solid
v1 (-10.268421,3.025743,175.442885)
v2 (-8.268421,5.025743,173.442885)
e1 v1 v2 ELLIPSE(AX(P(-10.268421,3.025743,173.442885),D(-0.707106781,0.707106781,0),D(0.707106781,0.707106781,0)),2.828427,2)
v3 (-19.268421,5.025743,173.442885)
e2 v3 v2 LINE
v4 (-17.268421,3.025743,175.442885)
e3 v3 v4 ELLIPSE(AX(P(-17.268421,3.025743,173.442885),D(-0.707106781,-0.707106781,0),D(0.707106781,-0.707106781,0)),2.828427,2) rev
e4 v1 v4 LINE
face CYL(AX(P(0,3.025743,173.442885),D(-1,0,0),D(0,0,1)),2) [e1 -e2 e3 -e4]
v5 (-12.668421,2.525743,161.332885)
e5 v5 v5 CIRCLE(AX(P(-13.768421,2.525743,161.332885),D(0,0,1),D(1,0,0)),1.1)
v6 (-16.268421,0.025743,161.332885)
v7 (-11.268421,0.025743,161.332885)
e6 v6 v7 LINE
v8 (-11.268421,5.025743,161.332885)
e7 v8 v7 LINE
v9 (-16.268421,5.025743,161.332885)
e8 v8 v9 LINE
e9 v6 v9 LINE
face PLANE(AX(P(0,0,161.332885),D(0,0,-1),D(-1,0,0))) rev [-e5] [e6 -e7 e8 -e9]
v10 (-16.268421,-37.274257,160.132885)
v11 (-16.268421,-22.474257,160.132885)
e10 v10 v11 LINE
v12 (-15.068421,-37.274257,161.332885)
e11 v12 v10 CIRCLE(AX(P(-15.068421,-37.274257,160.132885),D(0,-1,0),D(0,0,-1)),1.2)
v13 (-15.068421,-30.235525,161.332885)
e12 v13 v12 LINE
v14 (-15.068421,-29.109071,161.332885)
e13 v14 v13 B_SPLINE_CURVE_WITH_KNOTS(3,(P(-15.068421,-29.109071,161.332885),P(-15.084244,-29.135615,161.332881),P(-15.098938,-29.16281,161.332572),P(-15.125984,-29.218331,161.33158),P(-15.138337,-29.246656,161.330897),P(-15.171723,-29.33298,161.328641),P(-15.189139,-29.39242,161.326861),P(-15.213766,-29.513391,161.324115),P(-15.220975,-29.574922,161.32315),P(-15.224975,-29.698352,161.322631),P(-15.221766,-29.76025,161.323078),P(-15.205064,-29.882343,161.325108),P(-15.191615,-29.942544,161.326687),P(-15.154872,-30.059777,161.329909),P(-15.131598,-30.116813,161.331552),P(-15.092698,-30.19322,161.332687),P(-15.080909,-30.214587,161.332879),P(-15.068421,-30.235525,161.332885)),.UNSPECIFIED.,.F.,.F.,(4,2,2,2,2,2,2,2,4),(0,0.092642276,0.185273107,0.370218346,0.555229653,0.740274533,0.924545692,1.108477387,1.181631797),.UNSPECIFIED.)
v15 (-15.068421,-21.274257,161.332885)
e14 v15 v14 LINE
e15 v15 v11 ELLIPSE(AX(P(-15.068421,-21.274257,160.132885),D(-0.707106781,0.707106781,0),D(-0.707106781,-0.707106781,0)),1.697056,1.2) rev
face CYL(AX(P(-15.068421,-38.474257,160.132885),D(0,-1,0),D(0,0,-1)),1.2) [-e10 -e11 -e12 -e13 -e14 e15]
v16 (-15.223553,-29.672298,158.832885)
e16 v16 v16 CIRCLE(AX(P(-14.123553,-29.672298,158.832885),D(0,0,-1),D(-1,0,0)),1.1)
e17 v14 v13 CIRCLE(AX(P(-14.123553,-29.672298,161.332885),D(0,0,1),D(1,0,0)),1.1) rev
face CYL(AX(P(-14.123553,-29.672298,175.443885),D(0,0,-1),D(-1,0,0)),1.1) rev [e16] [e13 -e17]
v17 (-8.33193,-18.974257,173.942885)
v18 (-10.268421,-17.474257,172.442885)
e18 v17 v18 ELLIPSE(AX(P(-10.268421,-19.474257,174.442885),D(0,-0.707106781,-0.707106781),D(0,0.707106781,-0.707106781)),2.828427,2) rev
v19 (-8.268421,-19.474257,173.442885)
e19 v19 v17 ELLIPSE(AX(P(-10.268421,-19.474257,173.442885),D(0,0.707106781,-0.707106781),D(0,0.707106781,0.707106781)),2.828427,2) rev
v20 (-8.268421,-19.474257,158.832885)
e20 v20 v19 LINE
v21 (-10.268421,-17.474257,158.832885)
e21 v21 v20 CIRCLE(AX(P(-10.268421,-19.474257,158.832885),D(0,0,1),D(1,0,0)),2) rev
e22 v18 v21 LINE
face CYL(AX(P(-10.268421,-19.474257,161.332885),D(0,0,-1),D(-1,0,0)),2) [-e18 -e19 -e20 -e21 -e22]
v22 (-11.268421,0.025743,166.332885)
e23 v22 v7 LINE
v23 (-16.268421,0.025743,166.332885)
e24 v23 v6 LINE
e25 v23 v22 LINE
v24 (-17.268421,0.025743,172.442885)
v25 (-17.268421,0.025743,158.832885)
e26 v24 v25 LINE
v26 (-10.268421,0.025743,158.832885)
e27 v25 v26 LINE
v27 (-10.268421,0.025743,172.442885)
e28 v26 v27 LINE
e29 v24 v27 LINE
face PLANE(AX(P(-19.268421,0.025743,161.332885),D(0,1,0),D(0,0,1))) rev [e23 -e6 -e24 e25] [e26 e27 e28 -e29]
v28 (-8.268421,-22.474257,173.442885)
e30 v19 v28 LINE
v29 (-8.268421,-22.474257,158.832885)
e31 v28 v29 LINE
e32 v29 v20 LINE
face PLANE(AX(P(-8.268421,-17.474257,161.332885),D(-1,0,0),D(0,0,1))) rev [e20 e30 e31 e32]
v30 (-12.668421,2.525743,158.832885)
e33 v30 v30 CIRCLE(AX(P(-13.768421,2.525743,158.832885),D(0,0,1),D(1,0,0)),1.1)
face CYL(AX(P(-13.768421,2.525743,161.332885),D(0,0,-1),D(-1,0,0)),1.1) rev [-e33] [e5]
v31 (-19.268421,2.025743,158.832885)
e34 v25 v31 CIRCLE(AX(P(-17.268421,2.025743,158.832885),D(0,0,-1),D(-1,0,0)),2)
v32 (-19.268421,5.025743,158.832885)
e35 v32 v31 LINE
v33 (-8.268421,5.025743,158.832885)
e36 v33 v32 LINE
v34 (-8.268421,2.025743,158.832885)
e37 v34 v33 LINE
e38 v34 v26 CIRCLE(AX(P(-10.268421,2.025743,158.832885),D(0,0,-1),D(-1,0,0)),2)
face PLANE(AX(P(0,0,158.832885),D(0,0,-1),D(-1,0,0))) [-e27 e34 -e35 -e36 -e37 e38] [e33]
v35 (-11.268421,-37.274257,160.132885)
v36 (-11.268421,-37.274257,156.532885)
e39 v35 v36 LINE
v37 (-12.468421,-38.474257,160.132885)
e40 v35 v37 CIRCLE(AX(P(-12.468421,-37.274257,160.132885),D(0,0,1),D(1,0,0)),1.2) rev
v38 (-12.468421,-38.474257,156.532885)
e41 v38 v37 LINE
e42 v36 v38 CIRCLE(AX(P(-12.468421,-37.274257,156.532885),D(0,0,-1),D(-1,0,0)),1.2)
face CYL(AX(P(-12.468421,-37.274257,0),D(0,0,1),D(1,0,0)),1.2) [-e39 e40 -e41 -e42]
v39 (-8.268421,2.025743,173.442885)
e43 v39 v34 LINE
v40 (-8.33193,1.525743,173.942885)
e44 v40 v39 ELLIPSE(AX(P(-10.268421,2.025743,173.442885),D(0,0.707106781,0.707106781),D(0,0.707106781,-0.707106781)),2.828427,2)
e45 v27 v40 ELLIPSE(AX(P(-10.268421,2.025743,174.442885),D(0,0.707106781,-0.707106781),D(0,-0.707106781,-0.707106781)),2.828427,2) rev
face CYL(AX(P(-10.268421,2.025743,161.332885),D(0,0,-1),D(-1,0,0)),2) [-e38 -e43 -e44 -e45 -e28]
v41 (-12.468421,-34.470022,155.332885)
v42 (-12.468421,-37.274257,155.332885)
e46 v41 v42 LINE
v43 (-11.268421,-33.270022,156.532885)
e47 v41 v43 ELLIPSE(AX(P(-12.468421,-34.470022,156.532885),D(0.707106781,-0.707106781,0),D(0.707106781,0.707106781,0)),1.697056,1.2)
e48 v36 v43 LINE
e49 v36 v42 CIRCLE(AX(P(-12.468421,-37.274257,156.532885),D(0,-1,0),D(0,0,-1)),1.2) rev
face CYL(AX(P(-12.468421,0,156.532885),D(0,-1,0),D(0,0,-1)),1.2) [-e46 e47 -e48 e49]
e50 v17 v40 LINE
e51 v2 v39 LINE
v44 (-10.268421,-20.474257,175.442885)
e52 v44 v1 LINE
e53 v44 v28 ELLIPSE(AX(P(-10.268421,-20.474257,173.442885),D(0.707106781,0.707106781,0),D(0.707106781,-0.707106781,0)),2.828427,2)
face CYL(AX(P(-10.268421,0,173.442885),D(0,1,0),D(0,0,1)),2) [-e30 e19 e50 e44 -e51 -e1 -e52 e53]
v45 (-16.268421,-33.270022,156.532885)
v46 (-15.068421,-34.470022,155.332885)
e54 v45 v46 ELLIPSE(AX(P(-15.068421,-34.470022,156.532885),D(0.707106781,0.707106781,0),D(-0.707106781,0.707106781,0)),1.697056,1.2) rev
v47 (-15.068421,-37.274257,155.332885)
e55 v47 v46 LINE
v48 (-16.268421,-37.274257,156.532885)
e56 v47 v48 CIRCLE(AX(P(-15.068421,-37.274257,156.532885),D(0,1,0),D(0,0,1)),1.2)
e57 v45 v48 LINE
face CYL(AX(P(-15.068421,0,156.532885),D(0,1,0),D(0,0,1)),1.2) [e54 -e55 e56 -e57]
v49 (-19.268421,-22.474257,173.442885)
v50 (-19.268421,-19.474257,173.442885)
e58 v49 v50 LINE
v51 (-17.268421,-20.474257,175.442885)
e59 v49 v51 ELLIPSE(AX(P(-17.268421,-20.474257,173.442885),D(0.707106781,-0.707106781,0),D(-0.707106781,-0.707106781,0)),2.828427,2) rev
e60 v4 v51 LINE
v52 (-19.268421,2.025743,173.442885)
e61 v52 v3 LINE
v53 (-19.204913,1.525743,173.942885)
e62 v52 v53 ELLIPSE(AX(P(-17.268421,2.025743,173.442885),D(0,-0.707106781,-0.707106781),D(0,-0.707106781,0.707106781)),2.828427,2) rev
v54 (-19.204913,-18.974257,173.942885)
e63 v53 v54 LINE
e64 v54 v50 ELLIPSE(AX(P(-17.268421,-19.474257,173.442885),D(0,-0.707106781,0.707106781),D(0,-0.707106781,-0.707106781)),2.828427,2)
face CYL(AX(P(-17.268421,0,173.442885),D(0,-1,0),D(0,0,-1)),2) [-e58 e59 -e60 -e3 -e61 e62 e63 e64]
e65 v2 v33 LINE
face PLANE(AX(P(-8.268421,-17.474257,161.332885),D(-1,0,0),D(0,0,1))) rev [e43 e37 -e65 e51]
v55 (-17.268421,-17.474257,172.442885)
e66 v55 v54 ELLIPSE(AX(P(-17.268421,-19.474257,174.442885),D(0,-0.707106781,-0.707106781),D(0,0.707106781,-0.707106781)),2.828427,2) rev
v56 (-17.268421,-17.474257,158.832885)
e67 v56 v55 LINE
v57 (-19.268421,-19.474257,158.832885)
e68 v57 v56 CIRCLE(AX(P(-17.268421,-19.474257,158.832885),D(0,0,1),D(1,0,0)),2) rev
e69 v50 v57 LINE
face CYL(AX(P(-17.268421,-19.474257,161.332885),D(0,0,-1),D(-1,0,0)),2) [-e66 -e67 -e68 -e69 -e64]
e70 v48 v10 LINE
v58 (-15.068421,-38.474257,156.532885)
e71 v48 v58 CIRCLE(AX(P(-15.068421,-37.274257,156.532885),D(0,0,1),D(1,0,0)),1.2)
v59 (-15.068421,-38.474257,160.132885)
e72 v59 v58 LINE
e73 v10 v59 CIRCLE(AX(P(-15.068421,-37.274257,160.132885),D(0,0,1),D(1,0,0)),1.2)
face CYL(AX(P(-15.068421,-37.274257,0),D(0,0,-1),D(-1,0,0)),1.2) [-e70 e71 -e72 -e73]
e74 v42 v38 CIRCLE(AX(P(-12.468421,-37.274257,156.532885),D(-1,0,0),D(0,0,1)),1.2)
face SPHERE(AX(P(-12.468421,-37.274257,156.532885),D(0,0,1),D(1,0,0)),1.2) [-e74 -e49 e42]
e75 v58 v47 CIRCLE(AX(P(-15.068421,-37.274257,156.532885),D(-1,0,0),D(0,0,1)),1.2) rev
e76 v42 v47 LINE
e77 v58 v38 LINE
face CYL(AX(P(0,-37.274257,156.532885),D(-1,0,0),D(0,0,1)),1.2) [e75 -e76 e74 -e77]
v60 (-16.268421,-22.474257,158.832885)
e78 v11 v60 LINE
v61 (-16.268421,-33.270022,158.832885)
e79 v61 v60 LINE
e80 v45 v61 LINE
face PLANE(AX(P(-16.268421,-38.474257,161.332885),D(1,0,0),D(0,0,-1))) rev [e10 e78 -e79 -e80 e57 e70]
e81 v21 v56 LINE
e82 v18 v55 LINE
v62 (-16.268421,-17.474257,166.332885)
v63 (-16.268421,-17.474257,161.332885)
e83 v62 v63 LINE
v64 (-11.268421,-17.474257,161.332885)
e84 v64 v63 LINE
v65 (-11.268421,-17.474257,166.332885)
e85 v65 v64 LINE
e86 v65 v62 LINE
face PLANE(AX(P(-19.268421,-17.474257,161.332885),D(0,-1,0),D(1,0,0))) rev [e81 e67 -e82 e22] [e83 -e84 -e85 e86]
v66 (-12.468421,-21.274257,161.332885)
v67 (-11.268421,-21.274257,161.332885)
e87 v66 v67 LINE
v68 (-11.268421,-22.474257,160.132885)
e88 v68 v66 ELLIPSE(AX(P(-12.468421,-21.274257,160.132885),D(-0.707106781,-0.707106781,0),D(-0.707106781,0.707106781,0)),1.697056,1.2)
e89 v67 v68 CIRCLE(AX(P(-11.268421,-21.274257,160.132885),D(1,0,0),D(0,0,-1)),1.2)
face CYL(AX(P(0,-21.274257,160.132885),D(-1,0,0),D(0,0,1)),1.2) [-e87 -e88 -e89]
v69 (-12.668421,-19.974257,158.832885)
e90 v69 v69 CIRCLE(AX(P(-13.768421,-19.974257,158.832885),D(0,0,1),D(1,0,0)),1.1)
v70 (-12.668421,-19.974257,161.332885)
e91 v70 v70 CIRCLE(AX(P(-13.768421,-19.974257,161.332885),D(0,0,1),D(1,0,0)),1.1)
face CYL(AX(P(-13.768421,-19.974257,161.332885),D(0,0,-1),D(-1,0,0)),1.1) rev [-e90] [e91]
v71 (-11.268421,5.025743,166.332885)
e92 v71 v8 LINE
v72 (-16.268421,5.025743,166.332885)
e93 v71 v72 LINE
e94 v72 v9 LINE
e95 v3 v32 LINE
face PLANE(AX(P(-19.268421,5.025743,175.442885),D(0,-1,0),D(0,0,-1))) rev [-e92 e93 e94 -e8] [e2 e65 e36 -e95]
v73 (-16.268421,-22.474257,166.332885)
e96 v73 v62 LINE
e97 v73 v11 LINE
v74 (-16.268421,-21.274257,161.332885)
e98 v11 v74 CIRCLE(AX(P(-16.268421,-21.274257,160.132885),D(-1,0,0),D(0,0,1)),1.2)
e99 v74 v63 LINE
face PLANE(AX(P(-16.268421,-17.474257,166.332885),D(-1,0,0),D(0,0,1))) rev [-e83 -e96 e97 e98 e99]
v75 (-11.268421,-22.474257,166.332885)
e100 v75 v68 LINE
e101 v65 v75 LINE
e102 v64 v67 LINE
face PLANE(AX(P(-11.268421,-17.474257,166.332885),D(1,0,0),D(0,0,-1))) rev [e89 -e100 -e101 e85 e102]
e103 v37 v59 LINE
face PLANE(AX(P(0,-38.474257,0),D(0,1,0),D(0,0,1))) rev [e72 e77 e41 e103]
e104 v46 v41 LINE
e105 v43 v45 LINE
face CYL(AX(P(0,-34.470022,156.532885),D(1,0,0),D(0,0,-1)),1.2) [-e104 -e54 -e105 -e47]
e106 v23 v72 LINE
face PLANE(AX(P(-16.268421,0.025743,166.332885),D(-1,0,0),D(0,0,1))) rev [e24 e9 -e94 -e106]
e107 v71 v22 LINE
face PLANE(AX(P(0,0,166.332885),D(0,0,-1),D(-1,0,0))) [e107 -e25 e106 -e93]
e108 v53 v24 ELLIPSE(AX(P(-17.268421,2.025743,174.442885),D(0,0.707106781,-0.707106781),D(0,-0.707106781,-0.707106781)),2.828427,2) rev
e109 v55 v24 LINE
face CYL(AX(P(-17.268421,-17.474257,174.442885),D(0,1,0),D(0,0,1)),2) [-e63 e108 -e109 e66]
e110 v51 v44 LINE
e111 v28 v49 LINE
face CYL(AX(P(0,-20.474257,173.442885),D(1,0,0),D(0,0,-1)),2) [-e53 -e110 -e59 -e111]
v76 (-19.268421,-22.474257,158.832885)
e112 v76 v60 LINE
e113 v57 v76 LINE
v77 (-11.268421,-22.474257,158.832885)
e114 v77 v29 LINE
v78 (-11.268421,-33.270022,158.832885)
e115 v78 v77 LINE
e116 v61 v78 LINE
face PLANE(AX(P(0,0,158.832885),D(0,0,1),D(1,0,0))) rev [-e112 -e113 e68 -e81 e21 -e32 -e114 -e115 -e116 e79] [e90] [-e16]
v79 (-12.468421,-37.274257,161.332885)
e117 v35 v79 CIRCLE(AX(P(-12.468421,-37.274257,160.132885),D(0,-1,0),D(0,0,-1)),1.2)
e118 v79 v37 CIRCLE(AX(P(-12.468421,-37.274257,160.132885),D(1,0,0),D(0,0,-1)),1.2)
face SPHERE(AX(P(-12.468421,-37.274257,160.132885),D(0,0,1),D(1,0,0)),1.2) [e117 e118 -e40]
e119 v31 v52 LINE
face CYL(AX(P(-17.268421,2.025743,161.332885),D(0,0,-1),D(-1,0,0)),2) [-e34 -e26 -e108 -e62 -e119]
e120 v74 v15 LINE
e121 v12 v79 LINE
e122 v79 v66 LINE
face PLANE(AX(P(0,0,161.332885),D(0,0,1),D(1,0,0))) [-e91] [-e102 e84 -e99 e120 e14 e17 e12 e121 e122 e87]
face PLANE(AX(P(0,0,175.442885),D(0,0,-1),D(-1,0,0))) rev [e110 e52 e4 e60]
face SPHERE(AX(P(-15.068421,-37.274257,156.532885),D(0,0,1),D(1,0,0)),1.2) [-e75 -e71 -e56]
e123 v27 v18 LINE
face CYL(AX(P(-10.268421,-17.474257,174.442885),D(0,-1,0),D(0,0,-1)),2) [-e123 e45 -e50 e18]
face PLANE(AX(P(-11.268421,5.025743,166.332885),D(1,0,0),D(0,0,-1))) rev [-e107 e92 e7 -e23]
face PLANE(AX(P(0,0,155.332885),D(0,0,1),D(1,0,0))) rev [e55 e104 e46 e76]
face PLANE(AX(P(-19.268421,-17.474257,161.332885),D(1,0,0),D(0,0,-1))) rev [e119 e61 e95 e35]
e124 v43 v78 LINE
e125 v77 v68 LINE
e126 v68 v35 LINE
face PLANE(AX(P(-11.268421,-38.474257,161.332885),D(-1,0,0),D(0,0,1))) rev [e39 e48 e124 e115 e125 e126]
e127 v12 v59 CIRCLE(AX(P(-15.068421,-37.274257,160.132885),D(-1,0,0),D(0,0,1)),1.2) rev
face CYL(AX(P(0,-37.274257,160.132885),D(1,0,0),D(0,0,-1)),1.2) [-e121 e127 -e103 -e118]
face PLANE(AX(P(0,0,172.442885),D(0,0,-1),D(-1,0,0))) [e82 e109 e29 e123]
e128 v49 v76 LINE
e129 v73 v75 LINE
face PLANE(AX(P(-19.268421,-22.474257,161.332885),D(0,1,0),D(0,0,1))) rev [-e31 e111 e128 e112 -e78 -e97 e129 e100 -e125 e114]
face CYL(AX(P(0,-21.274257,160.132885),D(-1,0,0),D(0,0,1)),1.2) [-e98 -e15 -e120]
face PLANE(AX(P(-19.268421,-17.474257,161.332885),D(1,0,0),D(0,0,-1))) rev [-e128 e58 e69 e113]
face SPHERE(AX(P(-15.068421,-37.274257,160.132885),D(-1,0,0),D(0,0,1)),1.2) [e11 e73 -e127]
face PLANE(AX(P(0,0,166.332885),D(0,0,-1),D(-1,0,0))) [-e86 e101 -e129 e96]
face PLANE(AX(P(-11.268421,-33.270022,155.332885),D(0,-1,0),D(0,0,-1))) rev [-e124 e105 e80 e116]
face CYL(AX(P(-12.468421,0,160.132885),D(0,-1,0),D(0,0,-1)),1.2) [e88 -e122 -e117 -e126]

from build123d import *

# Parameters (mm, degrees)
SZKIC1_R                      = 1.100000000000001
DODANIE_WYCI_GNI_CIE1_DEPTH   = 2.5
SZKIC1_W                      = 10.999999999999996
SZKIC1_H                      = 5.000000000000001
SZKIC1_R_2                    = 1.1000003399999918
DODANIE_WYCI_GNI_CIE1_2_DEPTH = 2.5
SKETCH1_W                     = 2.9999999999999964
SKETCH1_H                     = 5
SKETCH1_W_2                   = 2.999999999999993
SKETCH1_H_2                   = 5.000000000000001
SKETCH1_W_3                   = 3
SKETCH1_H_3                   = 5.0000000000000036
BOSS_EXTRUDE1_DEPTH           = 5
SKETCH2_W                     = 11.000000000000002
SKETCH2_H                     = 5.0000000000000036
SKETCH2_W_2                   = 10.999999999999996
SKETCH2_H_2                   = 5.000000000000001
BOSS_EXTRUDE2_DEPTH           = 6.11
SKETCH3_W                     = 11
SKETCH3_H                     = 27.5
BOSS_EXTRUDE3_DEPTH           = 3
FILLET1_R                     = 2
FILLET4_R                     = 2
SKETCH4_W                     = 5.000000000000005
SKETCH4_H                     = 2.5000000000000284
BOSS_EXTRUDE4_DEPTH           = 16
SKETCH5_W                     = 5.000000000000005
SKETCH5_H                     = 5.204234406731111
BOSS_EXTRUDE5_DEPTH           = 3.5
CUT_EXTRUDE1_REACH            = 48.124
SKETCH6_R                     = 1.100000000000001
FILLET5_R                     = 1.2
FILLET6_R                     = 1.2
FILLET7_R                     = 1.2


# Some blends are built 0.0001 mm under size
with BuildPart() as part:
    # Szkic1 → Dodanie-wyciągnięcie1 (new body)
    with BuildSketch(Plane.XY.offset(158.8328846419772)):
        Polygon((-19.268421222013334, -17.474256580110417), (-8.268421222013332, -17.474256580110413), (-8.268421222013332, -22.474256580110417), (-19.268421222013334, -22.474256580110417), align=None)
        with Locations((-13.768421222013336, -19.974256580110417)):
            Circle(SZKIC1_R, mode=Mode.SUBTRACT)
    extrude(amount=DODANIE_WYCI_GNI_CIE1_DEPTH)



with BuildPart() as body_2:
    # Szkic1 → Dodanie-wyci_gni_cie1 2 (new body)
    with BuildSketch(Plane.XY.offset(158.8328846419772)):
        with Locations((-13.768421222013332, 2.5257434198895825)):
            Rectangle(SZKIC1_W, SZKIC1_H)
        with Locations((-13.768421222013332, 2.5257434198895856)):
            Circle(SZKIC1_R_2, mode=Mode.SUBTRACT)
    extrude(amount=DODANIE_WYCI_GNI_CIE1_2_DEPTH)


with BuildPart() as part_1:
    add(part.part)

    add(body_2.part)  # Boss-Extrude1 merges body 2
    # Sketch1 → Boss-Extrude1 (add)
    with BuildSketch(Plane.XY.offset(161.33288464197722)):
        with Locations((-17.768421222013338, -19.974256580110417)):
            Rectangle(SKETCH1_W, SKETCH1_H)
        with Locations((-17.768421222013334, 2.5257434198895825)):
            Rectangle(SKETCH1_W_2, SKETCH1_H_2)
        with Locations((-9.768421222013334, 2.5257434198895825)):
            Rectangle(SKETCH1_W_3, SKETCH1_H_2)
        with Locations((-9.768421222013332, -19.974256580110413)):
            Rectangle(SKETCH1_W_3, SKETCH1_H_3)
    extrude(amount=BOSS_EXTRUDE1_DEPTH)

    # Sketch2 → Boss-Extrude2 (add)
    with BuildSketch(Plane.XY.offset(166.33288464197722)):
        with Locations((-13.768421222013334, -19.974256580110413)):
            Rectangle(SKETCH2_W, SKETCH2_H)
        with Locations((-13.768421222013332, 2.5257434198895825)):
            Rectangle(SKETCH2_W_2, SKETCH2_H_2)
    extrude(amount=BOSS_EXTRUDE2_DEPTH)

    # Sketch3 → Boss-Extrude3 (add)
    with BuildSketch(Plane.XY.offset(172.4428846419772)):
        with Locations((-13.768421222013334, -8.724256580110417)):
            Rectangle(SKETCH3_W, SKETCH3_H)
    extrude(amount=BOSS_EXTRUDE3_DEPTH)

    # Fillet1
    fillet1_edges = [part_1.edges().sort_by_distance(p)[0] for p in [
        (-19.268421222013334, -8.724256580110417, 175.4428846419772),
        (-13.768421222013334, -22.474256580110417, 175.4428846419772),
        (-8.268421222013334, -8.724256580110417, 175.4428846419772),
        (-13.768421222013334, 5.025743419889583, 175.4428846419772),
    ]]
    fillet(fillet1_edges, radius=FILLET1_R)

    # Fillet4
    # the kernel refuses this fillet: 2 mm, written as the material it takes off along each edge
    with BuildSketch(Plane(origin=(-8.268421222013334, -17.474256580110413, 172.4428846419772), x_dir=(0, 0, 1), z_dir=(0, 1, 0))) as fillet4_piece_1:
        with BuildLine():
            CenterArc((FILLET4_R, -FILLET4_R), FILLET4_R, 90, 90)
            Line((0, -FILLET4_R), (0, 0))
            Line((0, 0), (FILLET4_R, 0))
        make_face()
    extrude(amount=17.499999999999996, mode=Mode.SUBTRACT)
    with BuildSketch(Plane(origin=(-19.268421222013334, 0.02574341988958206, 172.4428846419772), x_dir=(1.78e-15, 0, 1), z_dir=(0, -1, 0))) as fillet4_piece_2:
        with BuildLine():
            CenterArc((FILLET4_R, -FILLET4_R), FILLET4_R, 90.0000000000001, 89.9999999999999)
            Line((3.55e-15, -FILLET4_R), (0, 0))
            Line((0, 0), (FILLET4_R, 0))
        make_face()
    extrude(amount=17.499999999999996, mode=Mode.SUBTRACT)
    with BuildSketch(Plane(origin=(-8.268421222013334, 0.02574341988958231, 153.8328846419772), x_dir=(0, 1, 0), z_dir=(0, 0, 1)), Plane(origin=(-19.26842122201333, 0.02574341988958231, 172.44288464197723), x_dir=(0, 1, 0), z_dir=(0, 0, -1))) as fillet4_piece_3:
        with BuildLine():
            CenterArc((FILLET4_R, FILLET4_R), FILLET4_R, 180, 90)
            Line((-2.5e-16, FILLET4_R), (0, 0))
            Line((0, 0), (FILLET4_R, 0))
        make_face()
    extrude(amount=18.610000000000042, mode=Mode.SUBTRACT)
    with BuildSketch(Plane(origin=(-19.26842122201333, -17.474256580110417, 153.8328846419772), x_dir=(0, -1, 2.6e-16), z_dir=(0, 2.6e-16, 1))) as fillet4_piece_4:
        with BuildLine():
            CenterArc((FILLET4_R, FILLET4_R), FILLET4_R, 180, 90)
            Line((0, FILLET4_R), (0, 0))
            Line((0, 0), (FILLET4_R, 0))
        make_face()
    extrude(amount=18.610000000000042, mode=Mode.SUBTRACT)
    with BuildSketch(Plane(origin=(-8.268421222013332, -17.474256580110413, 172.44288464197723), x_dir=(-8.9e-16, -1, 0), z_dir=(0, 0, -1))) as fillet4_piece_5:
        with BuildLine():
            CenterArc((FILLET4_R, FILLET4_R), FILLET4_R, 180, 89.99999999999994)
            Line((1.78e-15, FILLET4_R), (0, 0))
            Line((0, 0), (FILLET4_R, 0))
        make_face()
    extrude(amount=18.610000000000042, mode=Mode.SUBTRACT)
    with BuildSketch(Plane(origin=(-8.268421222013334, -17.474256580110413, 177.44288464197723), x_dir=(0, -1, 0), z_dir=(0, 0, -1))) as fillet4_piece_6a_section:
        with BuildLine():
            CenterArc((FILLET4_R, FILLET4_R), FILLET4_R, 180.00000000000006, 89.99999999999994)
            Line((0, FILLET4_R), (0, 0))
            Line((0, 0), (FILLET4_R, 0))
        make_face()
    fillet4_piece_6a = extrude(amount=23.610000000000042, mode=Mode.PRIVATE)
    fillet4_piece_6a = split(fillet4_piece_6a, bisect_by=Plane(origin=(-8.721211450546983, -17.92704680864406, 172.4428846419772), z_dir=(0, 0, 1)), keep=Keep.TOP, mode=Mode.PRIVATE)
    with BuildSketch(Plane(origin=(-8.268421222013334, -22.474256580110413, 172.4428846419772), x_dir=(0, 0, 1), z_dir=(0, 1, 0))) as fillet4_piece_6b_section:
        with BuildLine():
            CenterArc((FILLET4_R, -FILLET4_R), FILLET4_R, 90, 90)
            Line((0, -FILLET4_R), (0, 0))
            Line((0, 0), (FILLET4_R, 0))
        make_face()
    fillet4_piece_6b = extrude(amount=22.499999999999996, mode=Mode.PRIVATE)
    fillet4_piece_6b = split(fillet4_piece_6b, bisect_by=Plane(origin=(-8.721211450546978, -17.474256580110413, 172.89567487051085), z_dir=(3.2e-16, -1, 0)), keep=Keep.TOP, mode=Mode.PRIVATE)
    fillet4_piece_6 = fillet4_piece_6a & fillet4_piece_6b
    add(fillet4_piece_6, mode=Mode.SUBTRACT)
    with BuildSketch(Plane(origin=(-8.268421222013334, -17.474256580110413, 172.4428846419772), x_dir=(0, 0, 1), z_dir=(0, 1, 0))) as fillet4_piece_7a_section:
        with BuildLine():
            CenterArc((FILLET4_R, -FILLET4_R), FILLET4_R, 90, 90)
            Line((0, -FILLET4_R), (0, 0))
            Line((0, 0), (FILLET4_R, 0))
        make_face()
    fillet4_piece_7a = extrude(amount=22.499999999999996, mode=Mode.PRIVATE)
    fillet4_piece_7a = split(fillet4_piece_7a, bisect_by=Plane(origin=(-8.721211450546976, 0.02574341988958231, 172.89567487051085), z_dir=(0, 1, 0)), keep=Keep.TOP, mode=Mode.PRIVATE)
    with BuildSketch(Plane(origin=(-8.268421222013334, 0.02574341988958231, 153.8328846419772), x_dir=(0, 1, 0), z_dir=(0, 0, 1))) as fillet4_piece_7b_section:
        with BuildLine():
            CenterArc((FILLET4_R, FILLET4_R), FILLET4_R, 180, 90)
            Line((-2.5e-16, FILLET4_R), (0, 0))
            Line((0, 0), (FILLET4_R, 0))
        make_face()
    fillet4_piece_7b = extrude(amount=23.610000000000042, mode=Mode.PRIVATE)
    fillet4_piece_7b = split(fillet4_piece_7b, bisect_by=Plane(origin=(-8.721211450546985, 0.4785336484232321, 172.4428846419772), z_dir=(0, 0, 1)), keep=Keep.TOP, mode=Mode.PRIVATE)
    fillet4_piece_7 = fillet4_piece_7a & fillet4_piece_7b
    add(fillet4_piece_7, mode=Mode.SUBTRACT)
    with BuildSketch(Plane(origin=(-19.26842122201333, 0.02574341988958206, 177.44288464197723), x_dir=(0, 1, 0), z_dir=(0, 0, -1))) as fillet4_piece_8a_section:
        with BuildLine():
            CenterArc((FILLET4_R, FILLET4_R), FILLET4_R, 180, 90)
            Line((0, FILLET4_R), (0, 0))
            Line((0, 0), (FILLET4_R, 0))
        make_face()
    fillet4_piece_8a = extrude(amount=23.610000000000042, mode=Mode.PRIVATE)
    fillet4_piece_8a = split(fillet4_piece_8a, bisect_by=Plane(origin=(-18.81563099347968, 0.4785336484232321, 172.4428846419772), z_dir=(0, 0, 1)), keep=Keep.TOP, mode=Mode.PRIVATE)
    with BuildSketch(Plane(origin=(-19.26842122201333, 5.025743419889582, 172.4428846419772), x_dir=(0, 0, 1), z_dir=(0, -1, 0))) as fillet4_piece_8b_section:
        with BuildLine():
            CenterArc((FILLET4_R, -FILLET4_R), FILLET4_R, 90, 90)
            Line((0, -FILLET4_R), (0, 0))
            Line((0, 0), (FILLET4_R, 0))
        make_face()
    fillet4_piece_8b = extrude(amount=22.499999999999996, mode=Mode.PRIVATE)
    fillet4_piece_8b = split(fillet4_piece_8b, bisect_by=Plane(origin=(-18.815630993479687, 0.02574341988958231, 172.89567487051087), z_dir=(0, 1, 0)), keep=Keep.TOP, mode=Mode.PRIVATE)
    fillet4_piece_8 = fillet4_piece_8a & fillet4_piece_8b
    add(fillet4_piece_8, mode=Mode.SUBTRACT)
    with BuildSketch(Plane(origin=(-19.268421222013334, 0.02574341988958206, 172.4428846419772), x_dir=(1.78e-15, 0, 1), z_dir=(0, -1, 0))) as fillet4_piece_9a_section:
        with BuildLine():
            CenterArc((FILLET4_R, -FILLET4_R), FILLET4_R, 90.0000000000001, 89.9999999999999)
            Line((3.55e-15, -FILLET4_R), (0, 0))
            Line((0, 0), (FILLET4_R, 0))
        make_face()
    fillet4_piece_9a = extrude(amount=22.499999999999996, mode=Mode.PRIVATE)
    fillet4_piece_9a = split(fillet4_piece_9a, bisect_by=Plane(origin=(-18.815630993479687, -17.474256580110417, 172.89567487051082), z_dir=(3.2e-16, -1, 0)), keep=Keep.TOP, mode=Mode.PRIVATE)
    with BuildSketch(Plane(origin=(-19.26842122201333, -17.474256580110417, 153.8328846419772), x_dir=(0, -1, 2.6e-16), z_dir=(0, 2.6e-16, 1))) as fillet4_piece_9b_section:
        with BuildLine():
            CenterArc((FILLET4_R, FILLET4_R), FILLET4_R, 180, 90)
            Line((0, FILLET4_R), (0, 0))
            Line((0, 0), (FILLET4_R, 0))
        make_face()
    fillet4_piece_9b = extrude(amount=23.610000000000042, mode=Mode.PRIVATE)
    fillet4_piece_9b = split(fillet4_piece_9b, bisect_by=Plane(origin=(-18.815630993479676, -17.927046808644057, 172.4428846419772), z_dir=(0, 0, 1)), keep=Keep.TOP, mode=Mode.PRIVATE)
    fillet4_piece_9 = fillet4_piece_9a & fillet4_piece_9b
    add(fillet4_piece_9, mode=Mode.SUBTRACT)

    # Sketch4 → Boss-Extrude4 (add)
    with BuildSketch(Plane.XZ.offset(22.474256580110417)):
        with Locations((-13.768421222013334, 160.08288464197722)):
            Rectangle(SKETCH4_W, SKETCH4_H)
    extrude(amount=BOSS_EXTRUDE4_DEPTH)

    # Sketch5 → Boss-Extrude5 (add)
    with BuildSketch(Plane(origin=(0, 0, 158.8328846419772), x_dir=(-1, 0, 0), z_dir=(0, 0, -1))):
        with Locations((13.768421222013334, -35.872139376744855)):
            Rectangle(SKETCH5_W, SKETCH5_H)
    extrude(amount=BOSS_EXTRUDE5_DEPTH)

    # Sketch6 → Cut-Extrude1 (cut, up to next)
    with BuildSketch(Plane(origin=(0, 0, 158.8328846419772), x_dir=(-1, 0, 0), z_dir=(0, 0, -1)), mode=Mode.PRIVATE) as cut_extrude1_sk1:
        with Locations((14.12355315691837, -29.672298155784087)):
            Circle(SKETCH6_R)
    cut_extrude1_tool1 = extrude(cut_extrude1_sk1.sketch, amount=-CUT_EXTRUDE1_REACH, mode=Mode.PRIVATE) & part_1.part
    add(cut_extrude1_tool1.solids().sort_by_distance((-14.123553, -29.672298, 158.832885))[0], mode=Mode.SUBTRACT)

    # Fillet5
    fillet5_edges = [part_1.edges().sort_by_distance(p)[0] for p in [
        (-11.268421222013332, -35.872139376744855, 155.3328846419772),
        (-13.768421222013334, -38.47425658011041, 155.3328846419772),
        (-16.268421222013338, -35.872139376744855, 155.3328846419772),
        (-13.768421222013334, -33.2700221733793, 155.3328846419772),
    ]]
    fillet(fillet5_edges, radius=FILLET5_R)

    # Fillet6
    # the kernel refuses this fillet: 1.2 mm, written as the material it takes off along each edge
    with BuildSketch(Plane(origin=(-12.468421222013331, -37.27425658011042, 156.53288464197718), x_dir=(1, 0, 0), z_dir=(0, -1, 0))) as fillet6_piece_1_section:
        Polygon((0, 0), (FILLET6_R * 1.02, 0), (FILLET6_R * 1.02, -FILLET6_R * 1.02), (0, -FILLET6_R * 1.02), align=None)
    fillet6_piece_1 = extrude(amount=FILLET6_R * 1.02, mode=Mode.PRIVATE)
    fillet6_piece_1 = fillet6_piece_1 - Plane(origin=(-12.468421222013331, -37.27425658011042, 156.53288464197718), x_dir=(-0.7071067811865475, 0, 0.7071067811865475), z_dir=(0, -1, 0)) * Sphere(FILLET6_R, mode=Mode.PRIVATE)
    add(fillet6_piece_1, mode=Mode.SUBTRACT)
    with BuildSketch(Plane(origin=(-15.068421222013338, -37.27425658011042, 156.53288464197718), x_dir=(0, -1, 0), z_dir=(-1, 0, 0))) as fillet6_piece_2_section:
        Polygon((0, 0), (FILLET6_R * 1.02, 0), (FILLET6_R * 1.02, -FILLET6_R * 1.02), (0, -FILLET6_R * 1.02), align=None)
    fillet6_piece_2 = extrude(amount=FILLET6_R * 1.02, mode=Mode.PRIVATE)
    fillet6_piece_2 = fillet6_piece_2 - Plane(origin=(-15.068421222013338, -37.27425658011042, 156.53288464197718), x_dir=(0, 0.7071067811865475, 0.7071067811865475), z_dir=(-1, 0, 0)) * Sphere(FILLET6_R, mode=Mode.PRIVATE)
    add(fillet6_piece_2, mode=Mode.SUBTRACT)
    with BuildSketch(Plane(origin=(-12.468421222013331, -37.27425658011042, 160.13288464197723), x_dir=(0, -1, 0), z_dir=(1, 0, 0))) as fillet6_piece_3_section:
        Polygon((0, 0), (FILLET6_R * 1.02, 0), (FILLET6_R * 1.02, -FILLET6_R * 1.02), (0, -FILLET6_R * 1.02), align=None)
    fillet6_piece_3 = extrude(amount=FILLET6_R * 1.02, mode=Mode.PRIVATE)
    fillet6_piece_3 = fillet6_piece_3 - Plane(origin=(-12.468421222013331, -37.27425658011042, 160.13288464197723), x_dir=(0, 0.7071067811865475, -0.7071067811865475), z_dir=(1, 0, 0)) * Sphere(FILLET6_R, mode=Mode.PRIVATE)
    add(fillet6_piece_3, mode=Mode.SUBTRACT)
    with BuildSketch(Plane(origin=(-15.068421222013338, -37.27425658011042, 160.13288464197723), x_dir=(0, -1, 0), z_dir=(-1, 0, 0))) as fillet6_piece_4_section:
        Polygon((0, 0), (FILLET6_R * 1.02, 0), (FILLET6_R * 1.02, FILLET6_R * 1.02), (0, FILLET6_R * 1.02), align=None)
    fillet6_piece_4 = extrude(amount=FILLET6_R * 1.02, mode=Mode.PRIVATE)
    fillet6_piece_4 = fillet6_piece_4 - Plane(origin=(-15.068421222013338, -37.27425658011042, 160.13288464197723), x_dir=(0, 0.7071067811865475, -0.7071067811865475), z_dir=(-1, 0, 0)) * Sphere(FILLET6_R, mode=Mode.PRIVATE)
    add(fillet6_piece_4, mode=Mode.SUBTRACT)
    with BuildSketch(Plane(origin=(-11.268421222013332, -22.474256580110417, 161.33288464197722), x_dir=(-1, 0, -2.368e-14), z_dir=(0, -1, 0))) as fillet6_piece_5:
        with BuildLine():
            CenterArc((FILLET6_R, FILLET6_R), FILLET6_R, 180, 89.99999999999864)
            Line((2.842e-14, FILLET6_R), (0, 0))
            Line((0, 0), (FILLET6_R, 0))
        make_face()
    extrude(amount=14.8, mode=Mode.SUBTRACT)
    with BuildSketch(Plane(origin=(-16.268421222013338, -22.474256580110417, 161.33288464197722), x_dir=(0, 0, -1), z_dir=(0, -1, 0))) as fillet6_piece_6:
        with BuildLine():
            CenterArc((FILLET6_R, FILLET6_R), FILLET6_R, 180, 90)
            Line((0, FILLET6_R), (0, 0))
            Line((0, 0), (FILLET6_R, 0))
        make_face()
    extrude(amount=14.8, mode=Mode.SUBTRACT)
    with BuildSketch(Plane(origin=(-12.468421222013331, -38.47425658011042, 161.33288464197722), x_dir=(0, 0, -1), z_dir=(-1, 0, 0))) as fillet6_piece_7:
        with BuildLine():
            CenterArc((FILLET6_R, -FILLET6_R), FILLET6_R, 90, 90)
            Line((0, -FILLET6_R), (0, 0))
            Line((0, 0), (FILLET6_R, 0))
        make_face()
    extrude(amount=2.6000000000000068, mode=Mode.SUBTRACT)
    with BuildSketch(Plane(origin=(-16.268421222013338, -38.47425658011041, 156.53288464197718), x_dir=(0, 1, 1.18e-15), z_dir=(0, -1.18e-15, 1))) as fillet6_piece_8:
        with BuildLine():
            CenterArc((FILLET6_R, -FILLET6_R), FILLET6_R, 90, 90)
            Line((0, -FILLET6_R), (0, 0))
            Line((0, 0), (FILLET6_R, 0))
        make_face()
    extrude(amount=3.600000000000051, mode=Mode.SUBTRACT)
    with BuildSketch(Plane(origin=(-11.268421222013332, -38.47425658011042, 160.13288464197723), x_dir=(-1, 0, 0), z_dir=(0, 1.18e-15, -1))) as fillet6_piece_9:
        with BuildLine():
            CenterArc((FILLET6_R, FILLET6_R), FILLET6_R, 180, 90)
            Line((0, FILLET6_R), (0, 0))
            Line((0, 0), (FILLET6_R, 0))
        make_face()
    extrude(amount=3.600000000000051, mode=Mode.SUBTRACT)

    # Fillet7
    fillet7_edges = [part_1.edges().sort_by_distance(p)[0] for p in [
        (-15.668421222013, -22.47425658011, 161.332884641977),
        (-11.868421222013, -22.47425658011, 161.332884641977),
    ]]
    fillet(fillet7_edges, radius=FILLET7_R - 0.0001)  # a hair under: the kernel refuses the full size


solid = part_1.part
